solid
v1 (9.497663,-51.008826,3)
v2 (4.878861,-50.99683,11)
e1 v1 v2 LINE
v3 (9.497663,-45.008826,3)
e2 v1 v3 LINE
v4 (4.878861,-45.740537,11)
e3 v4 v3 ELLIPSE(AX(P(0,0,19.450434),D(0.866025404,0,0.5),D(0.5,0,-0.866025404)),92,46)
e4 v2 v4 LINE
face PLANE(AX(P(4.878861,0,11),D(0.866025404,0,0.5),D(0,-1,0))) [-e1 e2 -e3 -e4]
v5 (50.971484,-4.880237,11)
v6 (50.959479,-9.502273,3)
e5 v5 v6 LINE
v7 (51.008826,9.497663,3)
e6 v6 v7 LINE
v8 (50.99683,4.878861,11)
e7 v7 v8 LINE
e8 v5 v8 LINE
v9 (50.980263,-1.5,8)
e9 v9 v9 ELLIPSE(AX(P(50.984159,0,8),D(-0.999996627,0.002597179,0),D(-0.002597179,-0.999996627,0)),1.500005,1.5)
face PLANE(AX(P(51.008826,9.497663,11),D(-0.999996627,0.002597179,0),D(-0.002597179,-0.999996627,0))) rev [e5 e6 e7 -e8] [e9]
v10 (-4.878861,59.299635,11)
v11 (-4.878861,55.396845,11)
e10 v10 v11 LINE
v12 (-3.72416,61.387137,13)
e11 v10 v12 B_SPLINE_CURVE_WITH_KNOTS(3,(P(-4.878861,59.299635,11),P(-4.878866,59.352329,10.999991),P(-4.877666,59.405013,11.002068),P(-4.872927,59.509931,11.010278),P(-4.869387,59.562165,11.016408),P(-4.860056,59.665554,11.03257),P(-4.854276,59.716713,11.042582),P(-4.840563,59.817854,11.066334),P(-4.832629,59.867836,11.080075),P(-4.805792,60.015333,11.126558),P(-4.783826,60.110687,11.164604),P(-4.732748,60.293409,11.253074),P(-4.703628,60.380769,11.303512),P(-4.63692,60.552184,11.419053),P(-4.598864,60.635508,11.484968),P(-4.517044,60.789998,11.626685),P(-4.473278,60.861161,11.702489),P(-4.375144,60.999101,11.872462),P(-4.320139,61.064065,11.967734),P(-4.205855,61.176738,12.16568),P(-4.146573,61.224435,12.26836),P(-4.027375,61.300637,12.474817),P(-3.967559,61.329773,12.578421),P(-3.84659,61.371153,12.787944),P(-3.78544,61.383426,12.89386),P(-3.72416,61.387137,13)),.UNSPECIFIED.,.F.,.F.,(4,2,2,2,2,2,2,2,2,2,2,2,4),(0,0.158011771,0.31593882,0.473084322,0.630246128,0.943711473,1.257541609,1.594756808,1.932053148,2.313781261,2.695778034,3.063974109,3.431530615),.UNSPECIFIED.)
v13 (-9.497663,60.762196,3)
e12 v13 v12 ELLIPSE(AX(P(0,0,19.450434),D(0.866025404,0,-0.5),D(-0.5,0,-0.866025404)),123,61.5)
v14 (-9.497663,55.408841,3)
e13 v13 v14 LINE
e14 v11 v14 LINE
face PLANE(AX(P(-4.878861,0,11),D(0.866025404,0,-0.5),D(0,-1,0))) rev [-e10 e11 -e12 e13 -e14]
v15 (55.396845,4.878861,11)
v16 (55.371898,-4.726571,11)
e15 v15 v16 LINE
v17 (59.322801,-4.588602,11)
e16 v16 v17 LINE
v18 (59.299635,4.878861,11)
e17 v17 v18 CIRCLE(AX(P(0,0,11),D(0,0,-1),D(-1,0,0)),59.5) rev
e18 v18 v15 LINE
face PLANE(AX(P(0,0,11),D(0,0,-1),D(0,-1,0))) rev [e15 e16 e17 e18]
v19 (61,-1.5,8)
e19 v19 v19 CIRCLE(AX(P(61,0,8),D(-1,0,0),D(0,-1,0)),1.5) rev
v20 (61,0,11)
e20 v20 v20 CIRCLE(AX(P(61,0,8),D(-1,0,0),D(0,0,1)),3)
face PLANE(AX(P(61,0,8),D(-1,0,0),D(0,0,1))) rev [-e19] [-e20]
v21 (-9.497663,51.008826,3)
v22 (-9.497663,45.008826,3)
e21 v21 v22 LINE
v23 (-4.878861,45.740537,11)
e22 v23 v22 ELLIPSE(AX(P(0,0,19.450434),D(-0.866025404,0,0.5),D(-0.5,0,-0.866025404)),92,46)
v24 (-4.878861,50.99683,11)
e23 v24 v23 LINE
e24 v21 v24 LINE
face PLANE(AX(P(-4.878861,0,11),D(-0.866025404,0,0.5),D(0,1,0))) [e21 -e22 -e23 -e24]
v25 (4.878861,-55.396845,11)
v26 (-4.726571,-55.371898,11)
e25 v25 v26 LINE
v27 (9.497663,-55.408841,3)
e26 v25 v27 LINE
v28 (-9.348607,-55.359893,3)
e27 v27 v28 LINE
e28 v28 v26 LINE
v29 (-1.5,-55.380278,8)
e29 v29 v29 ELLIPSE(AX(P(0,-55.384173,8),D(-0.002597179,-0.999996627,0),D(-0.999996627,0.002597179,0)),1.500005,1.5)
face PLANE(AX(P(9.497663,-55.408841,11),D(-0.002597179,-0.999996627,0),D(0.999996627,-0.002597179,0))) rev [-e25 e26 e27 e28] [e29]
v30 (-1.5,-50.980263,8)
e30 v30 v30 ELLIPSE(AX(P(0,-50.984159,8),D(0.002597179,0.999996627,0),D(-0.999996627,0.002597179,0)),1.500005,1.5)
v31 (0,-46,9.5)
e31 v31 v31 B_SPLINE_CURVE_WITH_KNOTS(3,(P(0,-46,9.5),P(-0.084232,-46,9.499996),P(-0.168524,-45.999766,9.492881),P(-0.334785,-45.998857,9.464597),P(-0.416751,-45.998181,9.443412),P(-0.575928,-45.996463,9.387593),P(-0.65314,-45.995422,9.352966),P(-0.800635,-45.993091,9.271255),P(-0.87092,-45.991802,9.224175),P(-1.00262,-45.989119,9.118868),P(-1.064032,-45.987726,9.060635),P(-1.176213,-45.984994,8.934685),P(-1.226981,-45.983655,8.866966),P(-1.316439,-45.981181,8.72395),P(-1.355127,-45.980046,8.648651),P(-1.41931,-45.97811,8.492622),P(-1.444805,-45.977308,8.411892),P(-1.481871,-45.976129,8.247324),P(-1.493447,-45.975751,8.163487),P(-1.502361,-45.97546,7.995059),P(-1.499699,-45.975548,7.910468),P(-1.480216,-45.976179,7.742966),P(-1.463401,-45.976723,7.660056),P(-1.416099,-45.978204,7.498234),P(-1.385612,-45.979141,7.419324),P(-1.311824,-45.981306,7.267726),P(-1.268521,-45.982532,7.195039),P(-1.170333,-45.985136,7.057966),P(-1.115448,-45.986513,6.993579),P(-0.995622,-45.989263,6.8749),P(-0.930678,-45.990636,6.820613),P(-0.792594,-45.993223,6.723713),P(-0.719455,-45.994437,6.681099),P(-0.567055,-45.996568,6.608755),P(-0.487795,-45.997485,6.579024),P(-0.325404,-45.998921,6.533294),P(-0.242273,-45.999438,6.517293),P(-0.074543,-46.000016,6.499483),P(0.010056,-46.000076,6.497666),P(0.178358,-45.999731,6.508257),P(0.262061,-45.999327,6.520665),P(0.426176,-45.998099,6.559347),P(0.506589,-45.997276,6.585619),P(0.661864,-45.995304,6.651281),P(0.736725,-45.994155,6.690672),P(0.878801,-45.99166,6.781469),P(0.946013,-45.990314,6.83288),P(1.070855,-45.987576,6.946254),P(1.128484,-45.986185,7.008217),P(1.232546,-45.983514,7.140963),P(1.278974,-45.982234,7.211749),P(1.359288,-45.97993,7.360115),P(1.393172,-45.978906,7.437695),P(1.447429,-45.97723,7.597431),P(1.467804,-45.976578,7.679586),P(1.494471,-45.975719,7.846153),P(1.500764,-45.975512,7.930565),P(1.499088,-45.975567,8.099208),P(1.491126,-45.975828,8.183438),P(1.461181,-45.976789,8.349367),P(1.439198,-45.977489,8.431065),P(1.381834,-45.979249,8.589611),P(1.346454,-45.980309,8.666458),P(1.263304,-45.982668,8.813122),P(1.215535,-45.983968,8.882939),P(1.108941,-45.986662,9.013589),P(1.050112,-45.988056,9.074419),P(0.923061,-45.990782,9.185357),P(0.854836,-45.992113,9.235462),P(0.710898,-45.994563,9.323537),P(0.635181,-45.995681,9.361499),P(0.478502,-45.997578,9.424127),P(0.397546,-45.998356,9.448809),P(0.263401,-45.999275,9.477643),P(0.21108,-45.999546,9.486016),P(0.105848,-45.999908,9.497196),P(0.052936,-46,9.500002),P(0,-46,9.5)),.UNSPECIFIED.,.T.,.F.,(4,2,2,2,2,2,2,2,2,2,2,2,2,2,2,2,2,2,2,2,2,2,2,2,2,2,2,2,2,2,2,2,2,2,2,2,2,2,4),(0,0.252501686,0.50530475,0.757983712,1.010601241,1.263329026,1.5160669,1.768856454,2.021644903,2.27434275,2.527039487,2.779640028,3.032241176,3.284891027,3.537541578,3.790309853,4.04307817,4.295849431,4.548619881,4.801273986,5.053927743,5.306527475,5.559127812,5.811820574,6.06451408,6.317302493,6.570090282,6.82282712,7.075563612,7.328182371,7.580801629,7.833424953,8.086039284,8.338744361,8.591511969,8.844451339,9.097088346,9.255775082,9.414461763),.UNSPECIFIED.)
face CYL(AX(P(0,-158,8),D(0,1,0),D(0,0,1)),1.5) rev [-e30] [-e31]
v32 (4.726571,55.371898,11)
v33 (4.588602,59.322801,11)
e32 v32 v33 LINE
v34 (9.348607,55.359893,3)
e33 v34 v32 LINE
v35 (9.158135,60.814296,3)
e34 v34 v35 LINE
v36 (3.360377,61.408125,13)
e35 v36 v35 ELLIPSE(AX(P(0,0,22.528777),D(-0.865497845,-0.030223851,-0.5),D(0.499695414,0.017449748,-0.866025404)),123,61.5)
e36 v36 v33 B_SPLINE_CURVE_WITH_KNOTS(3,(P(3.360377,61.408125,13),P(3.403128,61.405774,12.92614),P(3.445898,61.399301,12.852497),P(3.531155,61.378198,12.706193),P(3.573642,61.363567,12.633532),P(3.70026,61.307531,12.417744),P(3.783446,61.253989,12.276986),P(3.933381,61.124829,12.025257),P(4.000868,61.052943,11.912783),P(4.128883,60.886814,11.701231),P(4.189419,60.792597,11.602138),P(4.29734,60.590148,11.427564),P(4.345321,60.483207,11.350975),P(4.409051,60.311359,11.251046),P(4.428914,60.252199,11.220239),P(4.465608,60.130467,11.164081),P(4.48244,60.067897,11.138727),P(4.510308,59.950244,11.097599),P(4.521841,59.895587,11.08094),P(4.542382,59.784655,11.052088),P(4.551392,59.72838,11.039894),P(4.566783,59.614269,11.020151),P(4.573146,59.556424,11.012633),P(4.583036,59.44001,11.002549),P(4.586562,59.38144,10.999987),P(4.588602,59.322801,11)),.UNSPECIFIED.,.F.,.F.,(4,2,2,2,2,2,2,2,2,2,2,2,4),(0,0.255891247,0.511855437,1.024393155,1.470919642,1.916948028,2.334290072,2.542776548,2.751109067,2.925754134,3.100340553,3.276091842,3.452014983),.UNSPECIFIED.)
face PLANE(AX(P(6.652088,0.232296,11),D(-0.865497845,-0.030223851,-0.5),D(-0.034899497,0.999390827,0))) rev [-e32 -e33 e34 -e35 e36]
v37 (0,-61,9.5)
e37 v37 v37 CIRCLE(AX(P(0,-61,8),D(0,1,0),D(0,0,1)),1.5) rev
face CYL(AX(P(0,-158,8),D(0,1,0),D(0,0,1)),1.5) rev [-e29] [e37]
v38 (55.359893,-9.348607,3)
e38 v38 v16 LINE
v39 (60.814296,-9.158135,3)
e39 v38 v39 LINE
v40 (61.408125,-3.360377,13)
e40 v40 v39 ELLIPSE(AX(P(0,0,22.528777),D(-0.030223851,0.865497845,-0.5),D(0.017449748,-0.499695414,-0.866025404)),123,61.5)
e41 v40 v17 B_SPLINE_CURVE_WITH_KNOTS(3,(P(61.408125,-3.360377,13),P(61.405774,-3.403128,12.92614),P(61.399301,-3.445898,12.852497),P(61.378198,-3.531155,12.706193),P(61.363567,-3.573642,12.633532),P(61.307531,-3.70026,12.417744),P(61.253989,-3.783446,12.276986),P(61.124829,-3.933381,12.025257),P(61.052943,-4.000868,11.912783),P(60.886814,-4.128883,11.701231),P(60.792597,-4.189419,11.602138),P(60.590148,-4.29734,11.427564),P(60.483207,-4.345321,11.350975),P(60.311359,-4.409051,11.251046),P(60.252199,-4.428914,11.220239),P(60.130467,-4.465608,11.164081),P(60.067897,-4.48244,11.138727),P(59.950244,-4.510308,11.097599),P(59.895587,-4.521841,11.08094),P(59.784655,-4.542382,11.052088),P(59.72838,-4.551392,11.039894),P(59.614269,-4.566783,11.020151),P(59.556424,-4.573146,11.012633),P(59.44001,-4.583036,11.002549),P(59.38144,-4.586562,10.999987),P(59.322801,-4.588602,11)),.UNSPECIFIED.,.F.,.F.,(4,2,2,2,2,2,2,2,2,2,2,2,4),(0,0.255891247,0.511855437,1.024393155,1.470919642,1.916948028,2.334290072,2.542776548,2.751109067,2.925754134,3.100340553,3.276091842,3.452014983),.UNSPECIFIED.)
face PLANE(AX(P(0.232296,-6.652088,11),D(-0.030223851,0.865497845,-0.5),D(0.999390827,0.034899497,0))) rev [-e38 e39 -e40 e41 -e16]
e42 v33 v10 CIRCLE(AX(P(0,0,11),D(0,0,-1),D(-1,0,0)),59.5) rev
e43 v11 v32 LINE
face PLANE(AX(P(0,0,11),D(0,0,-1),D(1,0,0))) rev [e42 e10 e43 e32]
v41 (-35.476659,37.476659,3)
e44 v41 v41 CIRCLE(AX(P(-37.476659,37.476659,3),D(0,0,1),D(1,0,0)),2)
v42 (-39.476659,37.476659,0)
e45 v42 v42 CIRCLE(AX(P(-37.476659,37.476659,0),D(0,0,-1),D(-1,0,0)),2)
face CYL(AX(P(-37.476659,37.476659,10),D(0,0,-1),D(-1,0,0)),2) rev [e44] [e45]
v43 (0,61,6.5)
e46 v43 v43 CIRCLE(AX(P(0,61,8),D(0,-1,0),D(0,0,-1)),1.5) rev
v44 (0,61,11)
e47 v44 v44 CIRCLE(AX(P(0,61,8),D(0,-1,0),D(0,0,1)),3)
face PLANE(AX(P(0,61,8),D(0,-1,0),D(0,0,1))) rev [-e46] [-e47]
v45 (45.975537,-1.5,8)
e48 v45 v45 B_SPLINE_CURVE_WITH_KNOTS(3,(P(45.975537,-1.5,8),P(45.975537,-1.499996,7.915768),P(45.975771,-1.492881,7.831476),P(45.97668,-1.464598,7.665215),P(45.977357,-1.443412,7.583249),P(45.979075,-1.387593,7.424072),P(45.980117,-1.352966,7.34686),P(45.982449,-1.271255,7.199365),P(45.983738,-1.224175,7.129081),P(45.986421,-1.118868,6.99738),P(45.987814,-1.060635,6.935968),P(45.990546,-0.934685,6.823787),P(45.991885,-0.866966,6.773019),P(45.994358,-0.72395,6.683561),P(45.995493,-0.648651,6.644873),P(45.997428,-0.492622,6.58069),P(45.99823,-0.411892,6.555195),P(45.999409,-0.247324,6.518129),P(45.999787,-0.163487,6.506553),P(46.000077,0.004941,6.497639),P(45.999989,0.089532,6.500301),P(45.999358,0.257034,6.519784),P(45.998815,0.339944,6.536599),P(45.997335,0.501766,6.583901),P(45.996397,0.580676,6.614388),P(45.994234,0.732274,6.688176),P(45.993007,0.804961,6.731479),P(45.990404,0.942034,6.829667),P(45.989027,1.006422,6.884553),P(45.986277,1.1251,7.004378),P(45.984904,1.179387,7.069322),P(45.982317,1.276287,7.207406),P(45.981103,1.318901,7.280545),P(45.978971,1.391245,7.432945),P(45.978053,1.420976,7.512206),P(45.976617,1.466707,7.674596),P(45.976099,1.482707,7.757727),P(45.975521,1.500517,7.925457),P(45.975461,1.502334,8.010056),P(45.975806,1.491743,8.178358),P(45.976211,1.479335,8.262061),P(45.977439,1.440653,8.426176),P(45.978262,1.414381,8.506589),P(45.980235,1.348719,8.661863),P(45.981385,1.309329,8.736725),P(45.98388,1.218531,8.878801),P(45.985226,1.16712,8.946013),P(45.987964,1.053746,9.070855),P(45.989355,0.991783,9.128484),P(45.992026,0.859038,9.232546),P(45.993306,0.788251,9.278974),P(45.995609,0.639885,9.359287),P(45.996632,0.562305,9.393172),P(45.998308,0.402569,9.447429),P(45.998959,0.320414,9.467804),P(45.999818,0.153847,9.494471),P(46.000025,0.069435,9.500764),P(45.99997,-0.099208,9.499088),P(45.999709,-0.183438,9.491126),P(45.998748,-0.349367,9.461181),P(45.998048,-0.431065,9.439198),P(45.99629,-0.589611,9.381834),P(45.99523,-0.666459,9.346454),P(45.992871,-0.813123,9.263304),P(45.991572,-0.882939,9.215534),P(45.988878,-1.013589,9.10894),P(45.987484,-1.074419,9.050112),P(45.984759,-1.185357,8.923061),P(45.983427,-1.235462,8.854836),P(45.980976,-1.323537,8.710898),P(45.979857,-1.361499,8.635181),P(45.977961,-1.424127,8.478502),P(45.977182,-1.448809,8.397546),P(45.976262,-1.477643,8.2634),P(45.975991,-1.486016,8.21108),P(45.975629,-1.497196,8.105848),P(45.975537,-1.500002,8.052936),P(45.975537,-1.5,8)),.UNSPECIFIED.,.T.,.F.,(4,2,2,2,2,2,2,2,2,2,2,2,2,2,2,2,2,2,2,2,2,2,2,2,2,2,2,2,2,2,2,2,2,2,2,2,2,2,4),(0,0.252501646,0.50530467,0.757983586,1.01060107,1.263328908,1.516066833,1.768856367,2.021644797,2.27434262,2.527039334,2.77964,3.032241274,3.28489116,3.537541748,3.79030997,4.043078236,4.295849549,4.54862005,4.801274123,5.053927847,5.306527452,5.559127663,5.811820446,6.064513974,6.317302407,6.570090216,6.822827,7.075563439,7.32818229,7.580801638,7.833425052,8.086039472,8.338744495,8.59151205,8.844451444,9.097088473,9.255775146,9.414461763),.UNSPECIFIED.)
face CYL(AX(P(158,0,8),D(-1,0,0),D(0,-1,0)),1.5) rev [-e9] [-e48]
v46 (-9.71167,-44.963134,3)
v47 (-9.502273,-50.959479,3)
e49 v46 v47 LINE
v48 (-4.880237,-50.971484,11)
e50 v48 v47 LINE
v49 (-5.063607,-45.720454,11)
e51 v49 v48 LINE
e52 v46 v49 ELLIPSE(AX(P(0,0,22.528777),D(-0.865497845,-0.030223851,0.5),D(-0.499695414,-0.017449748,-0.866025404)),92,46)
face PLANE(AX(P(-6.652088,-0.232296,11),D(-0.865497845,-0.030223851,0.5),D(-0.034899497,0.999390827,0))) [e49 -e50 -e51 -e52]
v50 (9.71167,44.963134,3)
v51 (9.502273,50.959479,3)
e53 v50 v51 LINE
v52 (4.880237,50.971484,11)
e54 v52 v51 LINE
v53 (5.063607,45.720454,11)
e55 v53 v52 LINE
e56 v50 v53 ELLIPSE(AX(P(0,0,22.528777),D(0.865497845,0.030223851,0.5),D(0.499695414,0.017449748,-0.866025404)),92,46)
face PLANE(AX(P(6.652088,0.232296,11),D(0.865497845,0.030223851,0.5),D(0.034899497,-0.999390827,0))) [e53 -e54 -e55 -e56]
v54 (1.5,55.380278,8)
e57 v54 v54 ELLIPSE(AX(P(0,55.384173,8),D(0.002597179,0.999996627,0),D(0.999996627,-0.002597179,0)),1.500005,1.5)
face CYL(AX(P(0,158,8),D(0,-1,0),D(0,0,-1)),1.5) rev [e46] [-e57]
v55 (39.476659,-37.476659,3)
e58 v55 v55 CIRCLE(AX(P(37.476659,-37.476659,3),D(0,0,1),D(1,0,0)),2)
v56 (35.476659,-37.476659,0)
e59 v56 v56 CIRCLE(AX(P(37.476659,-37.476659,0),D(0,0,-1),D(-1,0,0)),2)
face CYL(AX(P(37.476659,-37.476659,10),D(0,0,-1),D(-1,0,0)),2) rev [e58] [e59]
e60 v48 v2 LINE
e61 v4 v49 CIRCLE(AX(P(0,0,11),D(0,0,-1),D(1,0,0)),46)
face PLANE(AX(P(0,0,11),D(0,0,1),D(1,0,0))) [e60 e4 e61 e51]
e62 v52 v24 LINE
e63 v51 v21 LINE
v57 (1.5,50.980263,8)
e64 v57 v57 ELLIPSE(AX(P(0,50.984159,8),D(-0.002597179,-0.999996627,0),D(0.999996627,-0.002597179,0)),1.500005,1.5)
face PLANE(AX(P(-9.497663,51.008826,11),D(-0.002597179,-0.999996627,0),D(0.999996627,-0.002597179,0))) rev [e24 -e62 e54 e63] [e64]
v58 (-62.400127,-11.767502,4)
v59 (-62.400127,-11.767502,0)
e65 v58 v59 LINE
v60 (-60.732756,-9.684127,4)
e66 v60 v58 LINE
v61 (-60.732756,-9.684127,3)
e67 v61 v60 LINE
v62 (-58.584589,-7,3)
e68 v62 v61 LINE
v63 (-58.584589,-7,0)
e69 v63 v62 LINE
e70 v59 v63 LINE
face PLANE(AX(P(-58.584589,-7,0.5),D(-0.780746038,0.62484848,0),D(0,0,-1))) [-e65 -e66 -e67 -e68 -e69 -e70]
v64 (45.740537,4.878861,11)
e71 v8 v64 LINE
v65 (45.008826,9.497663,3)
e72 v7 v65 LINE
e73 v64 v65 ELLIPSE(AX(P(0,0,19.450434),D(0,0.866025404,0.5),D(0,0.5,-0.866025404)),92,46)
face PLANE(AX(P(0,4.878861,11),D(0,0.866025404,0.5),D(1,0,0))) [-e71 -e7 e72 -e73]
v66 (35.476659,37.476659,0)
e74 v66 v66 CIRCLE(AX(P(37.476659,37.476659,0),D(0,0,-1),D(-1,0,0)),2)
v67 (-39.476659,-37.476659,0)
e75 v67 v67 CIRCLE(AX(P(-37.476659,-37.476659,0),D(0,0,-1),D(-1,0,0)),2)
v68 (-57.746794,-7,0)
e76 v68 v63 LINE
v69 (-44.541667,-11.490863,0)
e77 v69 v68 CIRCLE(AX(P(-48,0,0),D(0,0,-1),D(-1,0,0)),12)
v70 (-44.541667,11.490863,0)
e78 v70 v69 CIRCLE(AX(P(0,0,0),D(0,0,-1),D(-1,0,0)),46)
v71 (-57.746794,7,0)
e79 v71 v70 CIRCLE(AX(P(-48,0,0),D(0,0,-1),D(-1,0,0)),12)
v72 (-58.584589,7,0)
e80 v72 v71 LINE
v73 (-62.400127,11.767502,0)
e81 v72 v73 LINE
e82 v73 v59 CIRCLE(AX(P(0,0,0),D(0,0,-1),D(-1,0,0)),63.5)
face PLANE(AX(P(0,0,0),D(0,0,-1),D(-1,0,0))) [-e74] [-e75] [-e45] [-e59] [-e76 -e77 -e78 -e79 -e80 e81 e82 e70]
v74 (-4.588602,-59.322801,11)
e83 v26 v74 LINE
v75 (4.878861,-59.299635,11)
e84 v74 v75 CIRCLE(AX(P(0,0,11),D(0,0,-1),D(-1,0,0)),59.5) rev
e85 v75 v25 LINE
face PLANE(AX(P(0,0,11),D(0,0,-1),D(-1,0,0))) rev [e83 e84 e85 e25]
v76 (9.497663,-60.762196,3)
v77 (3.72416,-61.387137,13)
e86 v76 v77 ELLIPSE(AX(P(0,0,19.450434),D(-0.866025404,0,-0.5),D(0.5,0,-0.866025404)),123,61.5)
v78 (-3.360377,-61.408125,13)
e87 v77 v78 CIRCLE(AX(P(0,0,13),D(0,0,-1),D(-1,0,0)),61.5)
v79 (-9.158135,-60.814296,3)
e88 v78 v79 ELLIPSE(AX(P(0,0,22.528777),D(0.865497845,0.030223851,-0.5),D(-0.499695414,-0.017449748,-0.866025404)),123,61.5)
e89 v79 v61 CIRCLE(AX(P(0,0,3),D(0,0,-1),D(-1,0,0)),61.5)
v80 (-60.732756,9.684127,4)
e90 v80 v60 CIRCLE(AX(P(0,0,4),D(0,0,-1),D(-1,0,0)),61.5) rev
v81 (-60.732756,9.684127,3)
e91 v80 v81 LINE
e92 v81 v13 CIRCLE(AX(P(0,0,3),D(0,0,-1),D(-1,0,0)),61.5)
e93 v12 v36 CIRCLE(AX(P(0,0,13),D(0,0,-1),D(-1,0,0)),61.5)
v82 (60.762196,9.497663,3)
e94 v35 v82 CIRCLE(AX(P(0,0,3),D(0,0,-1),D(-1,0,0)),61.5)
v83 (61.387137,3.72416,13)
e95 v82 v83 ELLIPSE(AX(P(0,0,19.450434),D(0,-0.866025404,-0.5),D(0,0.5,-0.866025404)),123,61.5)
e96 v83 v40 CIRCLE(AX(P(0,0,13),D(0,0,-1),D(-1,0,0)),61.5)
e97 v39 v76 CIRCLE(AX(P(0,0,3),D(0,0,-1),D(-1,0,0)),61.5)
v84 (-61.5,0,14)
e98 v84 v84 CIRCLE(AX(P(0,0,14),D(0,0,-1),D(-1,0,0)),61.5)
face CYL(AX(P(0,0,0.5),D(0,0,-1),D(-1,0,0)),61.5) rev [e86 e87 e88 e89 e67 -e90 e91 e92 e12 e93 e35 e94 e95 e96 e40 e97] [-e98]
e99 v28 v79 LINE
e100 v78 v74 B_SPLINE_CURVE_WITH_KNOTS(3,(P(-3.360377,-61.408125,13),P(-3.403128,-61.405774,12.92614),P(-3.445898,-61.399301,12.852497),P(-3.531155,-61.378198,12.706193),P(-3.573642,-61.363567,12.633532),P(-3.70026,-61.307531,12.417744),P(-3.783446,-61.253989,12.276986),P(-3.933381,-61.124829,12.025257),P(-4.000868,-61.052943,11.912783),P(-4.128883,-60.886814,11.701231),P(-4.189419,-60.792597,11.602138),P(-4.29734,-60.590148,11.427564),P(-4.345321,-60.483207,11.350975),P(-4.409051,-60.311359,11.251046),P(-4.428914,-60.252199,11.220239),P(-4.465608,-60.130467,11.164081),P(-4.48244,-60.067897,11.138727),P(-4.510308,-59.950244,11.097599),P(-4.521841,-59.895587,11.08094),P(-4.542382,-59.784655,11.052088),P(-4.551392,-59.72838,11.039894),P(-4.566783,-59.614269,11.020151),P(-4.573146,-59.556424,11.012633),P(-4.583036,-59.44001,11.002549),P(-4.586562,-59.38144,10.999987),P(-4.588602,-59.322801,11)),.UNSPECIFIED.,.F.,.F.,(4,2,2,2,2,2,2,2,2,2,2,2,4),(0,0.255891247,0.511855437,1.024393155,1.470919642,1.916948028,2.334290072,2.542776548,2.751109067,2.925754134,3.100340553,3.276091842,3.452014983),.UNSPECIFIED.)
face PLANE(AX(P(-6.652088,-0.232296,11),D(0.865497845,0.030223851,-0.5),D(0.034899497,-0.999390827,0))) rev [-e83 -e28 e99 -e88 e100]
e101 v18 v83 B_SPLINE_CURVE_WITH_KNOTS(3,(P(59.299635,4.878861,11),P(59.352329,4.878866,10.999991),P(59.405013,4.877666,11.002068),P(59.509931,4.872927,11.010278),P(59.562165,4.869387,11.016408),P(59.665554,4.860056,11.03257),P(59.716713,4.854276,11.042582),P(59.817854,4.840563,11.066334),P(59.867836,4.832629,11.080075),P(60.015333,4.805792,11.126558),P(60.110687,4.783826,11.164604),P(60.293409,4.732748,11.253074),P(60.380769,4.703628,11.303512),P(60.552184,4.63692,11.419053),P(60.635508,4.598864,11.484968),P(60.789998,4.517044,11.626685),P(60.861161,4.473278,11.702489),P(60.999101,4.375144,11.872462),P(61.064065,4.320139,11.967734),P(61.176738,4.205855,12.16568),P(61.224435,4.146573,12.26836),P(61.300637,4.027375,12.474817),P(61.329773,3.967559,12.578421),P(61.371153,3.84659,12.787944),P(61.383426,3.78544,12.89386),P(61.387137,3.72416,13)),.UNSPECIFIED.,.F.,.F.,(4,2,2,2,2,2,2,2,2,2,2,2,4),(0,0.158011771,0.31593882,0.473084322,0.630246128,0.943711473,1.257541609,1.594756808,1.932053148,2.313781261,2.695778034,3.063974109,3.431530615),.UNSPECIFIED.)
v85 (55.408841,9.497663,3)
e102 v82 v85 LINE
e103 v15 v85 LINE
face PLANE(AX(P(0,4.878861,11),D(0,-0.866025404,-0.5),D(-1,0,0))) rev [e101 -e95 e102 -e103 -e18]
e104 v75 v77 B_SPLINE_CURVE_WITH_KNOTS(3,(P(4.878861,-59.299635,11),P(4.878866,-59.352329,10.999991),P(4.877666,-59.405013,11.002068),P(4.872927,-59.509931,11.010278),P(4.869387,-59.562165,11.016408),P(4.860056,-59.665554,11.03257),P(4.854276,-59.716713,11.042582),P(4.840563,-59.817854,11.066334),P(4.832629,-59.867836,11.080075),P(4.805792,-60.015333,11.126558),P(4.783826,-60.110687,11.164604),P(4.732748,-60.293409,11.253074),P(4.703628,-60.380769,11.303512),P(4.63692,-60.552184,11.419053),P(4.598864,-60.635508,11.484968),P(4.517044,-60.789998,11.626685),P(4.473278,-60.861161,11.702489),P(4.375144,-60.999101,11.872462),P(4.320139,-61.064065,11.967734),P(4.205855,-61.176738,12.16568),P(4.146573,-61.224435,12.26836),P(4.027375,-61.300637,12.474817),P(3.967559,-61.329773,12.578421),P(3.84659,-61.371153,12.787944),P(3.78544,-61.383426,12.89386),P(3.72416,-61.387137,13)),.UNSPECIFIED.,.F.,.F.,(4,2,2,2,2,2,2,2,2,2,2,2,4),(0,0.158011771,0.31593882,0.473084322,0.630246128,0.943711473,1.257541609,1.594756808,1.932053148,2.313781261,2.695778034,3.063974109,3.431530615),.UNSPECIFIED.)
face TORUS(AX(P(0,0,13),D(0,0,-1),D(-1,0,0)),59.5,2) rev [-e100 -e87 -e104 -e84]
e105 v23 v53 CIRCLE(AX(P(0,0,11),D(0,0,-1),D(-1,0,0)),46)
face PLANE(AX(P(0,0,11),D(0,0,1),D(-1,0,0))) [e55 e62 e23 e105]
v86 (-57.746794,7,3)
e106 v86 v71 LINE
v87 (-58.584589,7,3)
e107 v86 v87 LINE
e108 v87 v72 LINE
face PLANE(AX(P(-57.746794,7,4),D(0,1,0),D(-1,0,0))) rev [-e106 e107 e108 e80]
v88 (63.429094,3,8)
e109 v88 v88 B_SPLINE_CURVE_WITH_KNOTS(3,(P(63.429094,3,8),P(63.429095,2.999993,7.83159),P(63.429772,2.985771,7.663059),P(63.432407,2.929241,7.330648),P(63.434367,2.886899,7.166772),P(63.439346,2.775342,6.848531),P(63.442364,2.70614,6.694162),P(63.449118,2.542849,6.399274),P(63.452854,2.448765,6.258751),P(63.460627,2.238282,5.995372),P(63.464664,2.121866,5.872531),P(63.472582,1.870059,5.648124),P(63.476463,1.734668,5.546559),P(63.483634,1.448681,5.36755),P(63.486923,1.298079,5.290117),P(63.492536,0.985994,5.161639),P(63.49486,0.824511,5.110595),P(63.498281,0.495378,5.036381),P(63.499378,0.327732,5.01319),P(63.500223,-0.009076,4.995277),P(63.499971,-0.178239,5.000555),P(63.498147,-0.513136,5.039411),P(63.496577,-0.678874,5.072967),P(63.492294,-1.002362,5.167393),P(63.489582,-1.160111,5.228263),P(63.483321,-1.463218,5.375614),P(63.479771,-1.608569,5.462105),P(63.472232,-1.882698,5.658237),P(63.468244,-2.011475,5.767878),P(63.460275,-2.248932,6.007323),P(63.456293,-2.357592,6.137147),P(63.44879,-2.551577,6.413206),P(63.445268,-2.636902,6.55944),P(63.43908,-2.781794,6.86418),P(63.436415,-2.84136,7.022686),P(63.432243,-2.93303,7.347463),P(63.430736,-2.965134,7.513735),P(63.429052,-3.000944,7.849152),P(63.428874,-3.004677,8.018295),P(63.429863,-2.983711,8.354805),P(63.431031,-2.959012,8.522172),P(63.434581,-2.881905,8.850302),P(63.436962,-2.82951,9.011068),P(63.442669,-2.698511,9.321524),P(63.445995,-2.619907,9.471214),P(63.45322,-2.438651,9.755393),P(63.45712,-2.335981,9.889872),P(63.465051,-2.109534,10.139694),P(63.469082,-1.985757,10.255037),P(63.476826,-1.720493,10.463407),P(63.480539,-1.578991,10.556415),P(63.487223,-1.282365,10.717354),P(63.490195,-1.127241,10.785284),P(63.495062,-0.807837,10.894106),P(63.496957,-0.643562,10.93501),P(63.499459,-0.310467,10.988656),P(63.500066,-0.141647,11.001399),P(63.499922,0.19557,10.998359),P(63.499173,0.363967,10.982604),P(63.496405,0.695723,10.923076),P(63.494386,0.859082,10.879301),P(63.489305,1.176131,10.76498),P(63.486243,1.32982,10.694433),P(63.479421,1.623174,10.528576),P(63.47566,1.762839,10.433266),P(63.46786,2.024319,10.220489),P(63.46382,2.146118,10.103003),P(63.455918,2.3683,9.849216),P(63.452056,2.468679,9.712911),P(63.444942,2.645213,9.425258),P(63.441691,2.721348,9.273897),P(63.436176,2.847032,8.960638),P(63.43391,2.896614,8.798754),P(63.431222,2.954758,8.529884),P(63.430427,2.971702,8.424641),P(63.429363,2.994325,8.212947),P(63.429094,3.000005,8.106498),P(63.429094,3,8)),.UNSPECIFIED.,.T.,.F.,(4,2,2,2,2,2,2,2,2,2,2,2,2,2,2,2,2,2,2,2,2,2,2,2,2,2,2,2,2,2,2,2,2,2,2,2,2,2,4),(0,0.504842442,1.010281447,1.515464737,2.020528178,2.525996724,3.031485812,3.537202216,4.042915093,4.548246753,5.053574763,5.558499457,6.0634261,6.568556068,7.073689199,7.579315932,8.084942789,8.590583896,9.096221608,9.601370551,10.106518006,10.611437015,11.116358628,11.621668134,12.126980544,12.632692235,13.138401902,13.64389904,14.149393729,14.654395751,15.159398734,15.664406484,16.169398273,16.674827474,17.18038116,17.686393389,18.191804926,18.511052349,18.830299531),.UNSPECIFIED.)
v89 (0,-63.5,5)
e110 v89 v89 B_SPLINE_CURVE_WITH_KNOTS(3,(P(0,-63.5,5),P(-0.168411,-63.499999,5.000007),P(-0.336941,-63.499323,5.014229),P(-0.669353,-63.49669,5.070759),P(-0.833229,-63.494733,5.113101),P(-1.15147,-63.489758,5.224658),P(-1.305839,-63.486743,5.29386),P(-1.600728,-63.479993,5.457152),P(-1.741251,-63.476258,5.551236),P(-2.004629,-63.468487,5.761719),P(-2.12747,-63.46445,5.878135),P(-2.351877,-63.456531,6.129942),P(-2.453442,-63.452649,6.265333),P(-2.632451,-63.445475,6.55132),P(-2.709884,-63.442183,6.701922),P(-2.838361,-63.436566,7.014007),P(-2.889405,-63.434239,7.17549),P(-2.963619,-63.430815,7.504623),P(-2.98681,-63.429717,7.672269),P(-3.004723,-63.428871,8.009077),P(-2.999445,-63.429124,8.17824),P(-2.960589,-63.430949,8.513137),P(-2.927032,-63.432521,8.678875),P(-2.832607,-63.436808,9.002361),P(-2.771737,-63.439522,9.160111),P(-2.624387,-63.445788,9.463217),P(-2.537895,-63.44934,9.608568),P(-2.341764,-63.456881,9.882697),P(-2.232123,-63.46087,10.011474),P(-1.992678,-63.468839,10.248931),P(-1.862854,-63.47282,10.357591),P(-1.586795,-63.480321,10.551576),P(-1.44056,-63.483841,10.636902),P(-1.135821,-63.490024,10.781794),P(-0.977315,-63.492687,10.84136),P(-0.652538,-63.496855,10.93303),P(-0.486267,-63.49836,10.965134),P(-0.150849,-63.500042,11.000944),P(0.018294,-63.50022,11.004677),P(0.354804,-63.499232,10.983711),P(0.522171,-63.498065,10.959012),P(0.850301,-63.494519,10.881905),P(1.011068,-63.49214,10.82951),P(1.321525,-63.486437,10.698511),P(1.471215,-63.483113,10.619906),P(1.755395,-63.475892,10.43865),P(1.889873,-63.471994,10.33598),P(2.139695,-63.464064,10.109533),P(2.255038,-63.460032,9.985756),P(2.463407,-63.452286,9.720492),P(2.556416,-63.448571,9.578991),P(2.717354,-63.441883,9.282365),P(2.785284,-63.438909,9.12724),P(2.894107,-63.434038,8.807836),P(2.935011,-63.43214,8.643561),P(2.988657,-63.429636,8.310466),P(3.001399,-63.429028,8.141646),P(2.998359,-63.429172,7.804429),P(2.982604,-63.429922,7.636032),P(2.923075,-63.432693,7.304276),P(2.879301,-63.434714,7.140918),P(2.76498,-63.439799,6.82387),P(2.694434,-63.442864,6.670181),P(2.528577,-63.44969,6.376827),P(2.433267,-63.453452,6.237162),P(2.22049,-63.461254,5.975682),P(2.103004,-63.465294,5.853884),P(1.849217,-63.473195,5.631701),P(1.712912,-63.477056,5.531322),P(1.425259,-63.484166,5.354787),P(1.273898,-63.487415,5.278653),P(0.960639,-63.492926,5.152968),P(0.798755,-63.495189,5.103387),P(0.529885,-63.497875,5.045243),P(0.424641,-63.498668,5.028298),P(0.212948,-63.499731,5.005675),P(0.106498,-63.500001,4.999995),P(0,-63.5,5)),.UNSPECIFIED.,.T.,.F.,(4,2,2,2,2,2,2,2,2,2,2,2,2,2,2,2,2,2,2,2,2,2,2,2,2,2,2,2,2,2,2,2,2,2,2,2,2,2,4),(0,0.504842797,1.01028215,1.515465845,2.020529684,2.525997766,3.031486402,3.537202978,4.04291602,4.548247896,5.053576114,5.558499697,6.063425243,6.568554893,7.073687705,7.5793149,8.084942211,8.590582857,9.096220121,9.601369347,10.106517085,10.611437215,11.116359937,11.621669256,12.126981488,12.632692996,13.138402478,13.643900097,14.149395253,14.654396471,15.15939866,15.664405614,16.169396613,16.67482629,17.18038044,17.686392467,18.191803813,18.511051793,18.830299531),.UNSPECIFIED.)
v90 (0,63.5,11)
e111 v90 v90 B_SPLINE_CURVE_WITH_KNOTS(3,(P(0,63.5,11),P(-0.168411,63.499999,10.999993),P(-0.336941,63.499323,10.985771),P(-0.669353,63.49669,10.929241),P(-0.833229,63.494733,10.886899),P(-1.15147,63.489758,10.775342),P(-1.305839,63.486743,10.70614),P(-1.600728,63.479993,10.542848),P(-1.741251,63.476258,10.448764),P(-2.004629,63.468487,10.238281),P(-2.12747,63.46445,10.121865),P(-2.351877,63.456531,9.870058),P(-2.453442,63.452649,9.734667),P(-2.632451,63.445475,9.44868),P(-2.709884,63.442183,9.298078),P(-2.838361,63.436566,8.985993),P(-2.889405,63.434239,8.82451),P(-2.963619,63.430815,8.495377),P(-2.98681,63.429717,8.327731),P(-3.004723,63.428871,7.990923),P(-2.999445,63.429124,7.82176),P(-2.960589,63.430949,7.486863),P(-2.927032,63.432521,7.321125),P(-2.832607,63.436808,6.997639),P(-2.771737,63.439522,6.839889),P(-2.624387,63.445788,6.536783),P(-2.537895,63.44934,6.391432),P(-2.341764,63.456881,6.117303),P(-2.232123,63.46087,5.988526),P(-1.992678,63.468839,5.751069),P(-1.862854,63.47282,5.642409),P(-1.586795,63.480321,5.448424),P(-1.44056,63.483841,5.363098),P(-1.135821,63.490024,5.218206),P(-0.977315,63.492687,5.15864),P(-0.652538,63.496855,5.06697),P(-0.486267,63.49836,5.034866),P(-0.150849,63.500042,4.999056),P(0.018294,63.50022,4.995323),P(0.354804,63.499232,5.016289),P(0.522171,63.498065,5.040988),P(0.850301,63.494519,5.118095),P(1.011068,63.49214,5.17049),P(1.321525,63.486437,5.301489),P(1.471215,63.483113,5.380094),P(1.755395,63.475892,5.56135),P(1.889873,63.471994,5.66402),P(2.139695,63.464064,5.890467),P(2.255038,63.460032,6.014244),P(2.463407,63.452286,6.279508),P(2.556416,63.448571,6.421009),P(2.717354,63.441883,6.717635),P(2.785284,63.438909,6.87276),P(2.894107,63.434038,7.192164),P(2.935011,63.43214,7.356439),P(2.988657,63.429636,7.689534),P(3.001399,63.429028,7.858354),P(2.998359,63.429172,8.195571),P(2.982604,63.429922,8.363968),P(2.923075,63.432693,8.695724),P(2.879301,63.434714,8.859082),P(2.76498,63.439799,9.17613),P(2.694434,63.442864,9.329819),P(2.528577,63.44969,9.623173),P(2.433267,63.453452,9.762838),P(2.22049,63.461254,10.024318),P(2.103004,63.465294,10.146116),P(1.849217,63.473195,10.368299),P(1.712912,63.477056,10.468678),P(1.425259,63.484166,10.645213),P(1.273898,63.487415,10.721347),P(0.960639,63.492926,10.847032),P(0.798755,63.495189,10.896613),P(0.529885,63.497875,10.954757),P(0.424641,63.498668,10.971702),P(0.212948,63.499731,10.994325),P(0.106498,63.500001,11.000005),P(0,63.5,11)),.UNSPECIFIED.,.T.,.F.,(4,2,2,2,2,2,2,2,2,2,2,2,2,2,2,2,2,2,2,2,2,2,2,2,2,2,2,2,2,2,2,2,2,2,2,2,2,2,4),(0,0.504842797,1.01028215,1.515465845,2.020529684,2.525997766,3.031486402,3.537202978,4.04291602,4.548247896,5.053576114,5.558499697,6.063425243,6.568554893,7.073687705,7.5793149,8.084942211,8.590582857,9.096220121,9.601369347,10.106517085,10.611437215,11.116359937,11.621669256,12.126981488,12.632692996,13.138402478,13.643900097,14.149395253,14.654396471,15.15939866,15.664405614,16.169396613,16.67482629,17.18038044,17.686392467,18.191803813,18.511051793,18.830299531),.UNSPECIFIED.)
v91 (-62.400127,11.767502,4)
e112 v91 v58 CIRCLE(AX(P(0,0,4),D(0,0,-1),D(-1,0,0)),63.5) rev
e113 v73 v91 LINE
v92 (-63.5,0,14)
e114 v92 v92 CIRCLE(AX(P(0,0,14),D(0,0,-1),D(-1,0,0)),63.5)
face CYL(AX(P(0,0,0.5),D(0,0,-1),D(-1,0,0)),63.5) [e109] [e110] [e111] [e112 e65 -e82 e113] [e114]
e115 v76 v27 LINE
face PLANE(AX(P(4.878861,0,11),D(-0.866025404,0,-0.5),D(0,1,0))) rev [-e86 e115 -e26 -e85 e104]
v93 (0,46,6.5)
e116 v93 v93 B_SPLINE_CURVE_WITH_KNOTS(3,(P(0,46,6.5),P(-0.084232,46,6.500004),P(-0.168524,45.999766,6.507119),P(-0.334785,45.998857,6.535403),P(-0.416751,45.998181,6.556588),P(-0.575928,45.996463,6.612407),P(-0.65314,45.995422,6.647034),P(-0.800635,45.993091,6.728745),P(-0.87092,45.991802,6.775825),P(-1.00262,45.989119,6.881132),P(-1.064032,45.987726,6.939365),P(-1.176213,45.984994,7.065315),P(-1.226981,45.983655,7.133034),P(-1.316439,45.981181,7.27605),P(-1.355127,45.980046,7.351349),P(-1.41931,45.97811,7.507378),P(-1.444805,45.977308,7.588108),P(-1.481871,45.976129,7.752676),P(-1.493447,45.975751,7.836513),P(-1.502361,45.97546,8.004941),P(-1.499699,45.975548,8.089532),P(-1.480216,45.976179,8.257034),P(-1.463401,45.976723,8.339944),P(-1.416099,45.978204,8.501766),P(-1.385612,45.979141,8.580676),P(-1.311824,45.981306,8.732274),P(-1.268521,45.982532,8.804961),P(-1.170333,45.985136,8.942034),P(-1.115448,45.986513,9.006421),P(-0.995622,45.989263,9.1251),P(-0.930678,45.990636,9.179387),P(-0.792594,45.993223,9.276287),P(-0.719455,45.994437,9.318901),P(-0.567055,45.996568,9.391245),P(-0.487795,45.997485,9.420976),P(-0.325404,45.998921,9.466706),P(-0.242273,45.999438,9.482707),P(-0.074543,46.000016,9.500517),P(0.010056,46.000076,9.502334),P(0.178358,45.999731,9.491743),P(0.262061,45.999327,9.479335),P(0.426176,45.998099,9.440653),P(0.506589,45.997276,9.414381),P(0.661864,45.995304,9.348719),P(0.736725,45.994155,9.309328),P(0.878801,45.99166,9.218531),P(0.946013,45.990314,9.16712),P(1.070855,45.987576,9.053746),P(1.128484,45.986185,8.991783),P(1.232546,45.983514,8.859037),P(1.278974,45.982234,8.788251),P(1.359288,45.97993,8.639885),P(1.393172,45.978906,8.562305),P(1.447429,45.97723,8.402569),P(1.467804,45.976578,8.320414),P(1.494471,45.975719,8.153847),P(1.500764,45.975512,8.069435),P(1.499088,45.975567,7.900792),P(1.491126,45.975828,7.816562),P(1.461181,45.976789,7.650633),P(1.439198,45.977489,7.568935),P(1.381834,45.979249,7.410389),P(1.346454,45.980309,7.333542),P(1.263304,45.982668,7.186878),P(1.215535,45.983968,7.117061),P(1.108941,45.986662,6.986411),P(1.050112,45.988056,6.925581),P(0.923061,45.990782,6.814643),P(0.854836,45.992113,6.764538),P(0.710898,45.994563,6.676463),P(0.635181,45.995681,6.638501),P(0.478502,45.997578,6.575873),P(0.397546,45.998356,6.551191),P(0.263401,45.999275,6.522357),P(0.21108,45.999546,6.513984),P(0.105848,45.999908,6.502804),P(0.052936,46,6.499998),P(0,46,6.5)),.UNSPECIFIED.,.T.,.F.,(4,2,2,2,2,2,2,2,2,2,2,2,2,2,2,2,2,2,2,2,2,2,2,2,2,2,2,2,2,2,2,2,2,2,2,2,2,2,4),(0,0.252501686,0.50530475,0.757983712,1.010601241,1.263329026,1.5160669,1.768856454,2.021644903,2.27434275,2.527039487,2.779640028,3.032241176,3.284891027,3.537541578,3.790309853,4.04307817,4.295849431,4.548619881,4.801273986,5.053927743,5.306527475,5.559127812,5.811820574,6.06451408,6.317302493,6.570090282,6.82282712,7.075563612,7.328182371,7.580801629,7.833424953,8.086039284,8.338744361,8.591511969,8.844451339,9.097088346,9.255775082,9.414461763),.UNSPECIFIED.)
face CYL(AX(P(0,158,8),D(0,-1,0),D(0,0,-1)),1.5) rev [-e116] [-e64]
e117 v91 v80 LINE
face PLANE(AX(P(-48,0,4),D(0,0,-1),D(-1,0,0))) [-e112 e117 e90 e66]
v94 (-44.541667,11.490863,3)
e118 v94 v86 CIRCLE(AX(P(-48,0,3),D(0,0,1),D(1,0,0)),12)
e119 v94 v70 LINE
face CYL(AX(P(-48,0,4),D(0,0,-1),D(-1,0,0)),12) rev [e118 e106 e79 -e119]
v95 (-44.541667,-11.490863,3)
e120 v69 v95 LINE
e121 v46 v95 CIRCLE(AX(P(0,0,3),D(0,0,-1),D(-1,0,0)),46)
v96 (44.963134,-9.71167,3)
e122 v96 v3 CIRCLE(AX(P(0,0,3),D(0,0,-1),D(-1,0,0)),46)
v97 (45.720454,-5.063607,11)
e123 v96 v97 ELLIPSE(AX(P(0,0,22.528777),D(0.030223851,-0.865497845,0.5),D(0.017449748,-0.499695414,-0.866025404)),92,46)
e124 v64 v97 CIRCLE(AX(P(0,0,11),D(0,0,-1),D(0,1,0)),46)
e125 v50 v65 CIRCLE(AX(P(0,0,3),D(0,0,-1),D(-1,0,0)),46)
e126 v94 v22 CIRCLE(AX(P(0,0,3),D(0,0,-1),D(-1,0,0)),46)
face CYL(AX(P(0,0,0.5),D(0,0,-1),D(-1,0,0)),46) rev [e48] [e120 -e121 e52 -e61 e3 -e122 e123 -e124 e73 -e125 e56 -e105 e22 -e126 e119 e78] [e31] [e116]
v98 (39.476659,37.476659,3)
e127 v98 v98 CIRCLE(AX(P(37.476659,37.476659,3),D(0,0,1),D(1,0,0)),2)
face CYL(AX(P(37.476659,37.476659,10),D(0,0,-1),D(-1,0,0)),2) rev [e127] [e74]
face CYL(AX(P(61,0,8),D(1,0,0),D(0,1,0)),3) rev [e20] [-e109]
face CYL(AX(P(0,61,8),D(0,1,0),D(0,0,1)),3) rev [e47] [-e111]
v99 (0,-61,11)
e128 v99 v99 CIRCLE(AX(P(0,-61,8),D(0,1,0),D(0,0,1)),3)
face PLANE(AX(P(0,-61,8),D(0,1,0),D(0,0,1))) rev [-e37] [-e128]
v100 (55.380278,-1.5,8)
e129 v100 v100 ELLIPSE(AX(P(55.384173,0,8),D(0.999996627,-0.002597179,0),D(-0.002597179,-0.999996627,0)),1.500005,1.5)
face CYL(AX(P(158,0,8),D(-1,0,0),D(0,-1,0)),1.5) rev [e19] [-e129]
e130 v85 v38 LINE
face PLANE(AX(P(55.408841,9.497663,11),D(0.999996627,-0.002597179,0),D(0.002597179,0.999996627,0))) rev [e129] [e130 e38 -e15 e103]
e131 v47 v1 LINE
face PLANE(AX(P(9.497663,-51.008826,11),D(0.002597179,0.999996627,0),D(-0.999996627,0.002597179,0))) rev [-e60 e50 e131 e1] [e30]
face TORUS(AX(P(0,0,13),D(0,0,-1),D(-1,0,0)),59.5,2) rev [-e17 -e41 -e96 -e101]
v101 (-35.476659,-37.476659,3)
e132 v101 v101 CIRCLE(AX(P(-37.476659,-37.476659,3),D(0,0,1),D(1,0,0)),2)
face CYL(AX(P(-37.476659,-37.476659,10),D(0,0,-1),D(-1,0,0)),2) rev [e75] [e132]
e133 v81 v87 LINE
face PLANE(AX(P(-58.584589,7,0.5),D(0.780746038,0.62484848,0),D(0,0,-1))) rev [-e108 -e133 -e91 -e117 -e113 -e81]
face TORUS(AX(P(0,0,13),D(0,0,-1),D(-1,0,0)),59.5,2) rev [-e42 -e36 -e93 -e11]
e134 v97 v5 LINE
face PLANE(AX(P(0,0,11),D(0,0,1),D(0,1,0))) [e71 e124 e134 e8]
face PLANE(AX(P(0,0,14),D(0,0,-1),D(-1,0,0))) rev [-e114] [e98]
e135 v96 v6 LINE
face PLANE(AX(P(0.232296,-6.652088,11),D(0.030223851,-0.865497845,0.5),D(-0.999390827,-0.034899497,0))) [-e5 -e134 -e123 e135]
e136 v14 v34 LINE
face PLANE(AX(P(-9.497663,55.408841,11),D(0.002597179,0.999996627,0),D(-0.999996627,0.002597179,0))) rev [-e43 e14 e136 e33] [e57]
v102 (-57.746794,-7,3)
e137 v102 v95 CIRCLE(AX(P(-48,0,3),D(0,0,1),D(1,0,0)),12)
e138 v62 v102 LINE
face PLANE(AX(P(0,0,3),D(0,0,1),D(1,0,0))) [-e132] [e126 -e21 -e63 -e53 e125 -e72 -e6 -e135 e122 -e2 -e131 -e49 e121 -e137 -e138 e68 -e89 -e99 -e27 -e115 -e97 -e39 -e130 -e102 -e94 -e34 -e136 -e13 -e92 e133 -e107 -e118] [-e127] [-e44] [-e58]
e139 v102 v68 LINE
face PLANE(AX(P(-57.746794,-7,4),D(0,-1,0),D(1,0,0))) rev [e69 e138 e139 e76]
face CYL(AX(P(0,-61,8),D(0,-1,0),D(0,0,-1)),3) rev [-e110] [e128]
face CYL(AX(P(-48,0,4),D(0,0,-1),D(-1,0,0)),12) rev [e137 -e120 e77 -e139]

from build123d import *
from OCP.BRepFilletAPI import BRepFilletAPI_MakeChamfer

# Parameters (mm, degrees)
CUT_EXTRUDE1_DEPTH             = 4
CHAMFER1_SIZE                  = 4.528404541
BOSS_EXTRUDE1_START            = 8
BOSS_EXTRUDE1_DEPTH            = 8
CHAMFER2_SIZE                  = 8
CHAMFER2_SIZE_2                = 4.618802154
CIRPATTERN1_COUNT              = 3
CIRPATTERN1_ANGLE              = 180
CHAMFER2_OF_CIRPATTERN1_SIZE   = 8
CHAMFER2_OF_CIRPATTERN1_SIZE_2 = 4.618802154
FILLET1_R                      = 2
SKETCH4_R                      = 2
CUT_EXTRUDE2_DEPTH             = 10
SKETCH5_R                      = 1.5
CUT_EXTRUDE3_DEPTH             = 158
SKETCH7_R                      = 3
CUT_EXTRUDE5_DEPTH             = 4
CIRPATTERN3_COUNT              = 3
CIRPATTERN3_ANGLE              = 180


# Some blends are built 0.0001 mm under size
with BuildPart() as part:
    # Sketch1 → Revolve1 (revolve)
    with BuildSketch(Plane(origin=(0, 0, 0), x_dir=(1, 0, 0), z_dir=(0, 1, 0))):
        Polygon((-46, 0), (-46, -3), (-61.5, -3), (-61.5, -14), (-63.5, -14), (-63.5, 0), align=None)
    revolve(axis=Axis((0, 0, 0.5), (0, 0, 1)))

    # Sketch2 → Cut-Extrude1 (cut)
    with BuildSketch(Plane(origin=(0, 0, 0), x_dir=(-1, 0, 0), z_dir=(0, 0, -1))):
        with BuildLine():
            Line((57.746794345, 7), (73.255615774, 7))
            Line((73.255615774, 7), (73.255615774, -7))
            Line((73.255615774, -7), (57.746794345, -7))
            ThreePointArc((57.746794345, -7), (36, 0), (57.746794345, 7))
        make_face()
    extrude(amount=-CUT_EXTRUDE1_DEPTH, mode=Mode.SUBTRACT)

    # Chamfer1
    # the kernel refuses this chamfer: 5, 4.528404541 mm, written as the material it takes off along each edge
    with BuildSketch(Plane(origin=(-63.112993908, -7, 4), x_dir=(1, 0, 0), z_dir=(0, 0, -1))) as chamfer1_piece_1:
        with BuildLine():
            Line((CHAMFER1_SIZE, 0), (0.712866483, 4.767501749))
            ThreePointArc((0.712866483, 4.767501749), (0.321261242, 2.457711608), (0, 0))
            Line((0, 0), (CHAMFER1_SIZE, 0))
        make_face()
    extrude(amount=16.39656237, mode=Mode.SUBTRACT)
    with BuildSketch(Plane(origin=(-63.112993908, 7, 4), x_dir=(1, 0, 0), z_dir=(0, 0, -1))) as chamfer1_piece_2:
        with BuildLine():
            Line((CHAMFER1_SIZE, 0), (0.712866483, -4.767501749))
            ThreePointArc((0.712866483, -4.767501749), (0.321261242, -2.457711608), (0, 0))
            Line((0, 0), (CHAMFER1_SIZE, 0))
        make_face()
    extrude(amount=16.39656237, mode=Mode.SUBTRACT)

    # Sketch3 → Boss-Extrude1 (add)
    with BuildSketch(Plane.XY.offset(3).offset(BOSS_EXTRUDE1_START)):
        with BuildLine():
            Line((-9.502273243, -50.959479433), (-9.711670224, -44.963134471))
            ThreePointArc((-9.711670224, -44.963134471), (-0.109415415, -45.999869872), (9.497662676, -45.008825842))
            Line((9.497662676, -45.008825842), (9.497662676, -51.008825842))
            Line((9.497662676, -51.008825842), (-9.502273243, -50.959479433))
        make_face()
        with BuildLine():
            Line((9.497662676, -55.408840682), (-9.348607402, -55.359893372))
            Line((-9.348607402, -55.359893372), (-9.158135478, -60.814295643))
            ThreePointArc((-9.158135478, -60.814295643), (0.171750649, -61.499760176), (9.497662676, -60.762195514))
            Line((9.497662676, -60.762195514), (9.497662676, -55.408840682))
        make_face()
    boss_extrude1 = extrude(amount=-BOSS_EXTRUDE1_DEPTH)

    # Chamfer2
    chamfer2_edges_1 = [part.edges().sort_by_distance(p)[0] for p in [
        (-9.25337144, -58.087094508, 11),
    ]]
    chamfer2_side_1 = [part.faces().sort_by_distance(p)[0] for p in [
        (-9.25337144, -58.087094508, 10.907623957),
    ]]
    chamfer2_edges_2 = [part.edges().sort_by_distance(p)[0] for p in [
        (-9.606971733, -47.961306952, 11),
    ]]
    chamfer2_side_2 = [part.faces().sort_by_distance(p)[0] for p in [
        (-9.606971733, -47.961306952, 10.907623957),
    ]]
    chamfer2_edges_3 = [part.edges().sort_by_distance(p)[0] for p in [
        (9.497662676, -48.008825842, 11),
    ]]
    chamfer2_side_3 = [part.faces().sort_by_distance(p)[0] for p in [
        (9.497662676, -48.008825842, 10.907623957),
    ]]
    chamfer2_edges_4 = [part.edges().sort_by_distance(p)[0] for p in [
        (9.497662676, -58.085518098, 11),
    ]]
    chamfer2_side_4 = [part.faces().sort_by_distance(p)[0] for p in [
        (9.497662676, -58.085518098, 10.907623957),
    ]]
    chamfer2 = BRepFilletAPI_MakeChamfer(part.part.solid().wrapped)
    for e in chamfer2_edges_1:
        chamfer2.Add(CHAMFER2_SIZE - 0.0001, CHAMFER2_SIZE_2 - 0.0001, e.wrapped, chamfer2_side_1[0].wrapped)
    for e in chamfer2_edges_2:
        chamfer2.Add(CHAMFER2_SIZE - 0.0001, CHAMFER2_SIZE_2 - 0.0001, e.wrapped, chamfer2_side_2[0].wrapped)
    for e in chamfer2_edges_3:
        chamfer2.Add(CHAMFER2_SIZE - 0.0001, CHAMFER2_SIZE_2 - 0.0001, e.wrapped, chamfer2_side_3[0].wrapped)
    for e in chamfer2_edges_4:
        chamfer2.Add(CHAMFER2_SIZE - 0.0001, CHAMFER2_SIZE_2 - 0.0001, e.wrapped, chamfer2_side_4[0].wrapped)
    add(Compound.cast(chamfer2.Shape()), mode=Mode.REPLACE)  # a hair under: the kernel refuses the full size

    # CirPattern1: Boss-Extrude1 ×3 about axis
    cirpattern1_axis = Axis((0, 0, 0), (0, 0, 1))
    for i in range(1, CIRPATTERN1_COUNT):
        add(boss_extrude1.rotate(cirpattern1_axis, i * CIRPATTERN1_ANGLE / (CIRPATTERN1_COUNT - 1)))

    # Chamfer2 of CirPattern1
    chamfer2_of_cirpattern1_edges_1 = [part.edges().sort_by_distance(p)[0] for p in [
        (58.087094508, -9.25337144, 11),
    ]]
    chamfer2_of_cirpattern1_side_1 = [part.faces().sort_by_distance(p)[0] for p in [
        (58.087094508, -9.25337144, 10.907623957),
    ]]
    chamfer2_of_cirpattern1_edges_2 = [part.edges().sort_by_distance(p)[0] for p in [
        (47.961306952, -9.606971733, 11),
    ]]
    chamfer2_of_cirpattern1_side_2 = [part.faces().sort_by_distance(p)[0] for p in [
        (47.958083075, -9.514651963, 11),
    ]]
    chamfer2_of_cirpattern1_edges_3 = [part.edges().sort_by_distance(p)[0] for p in [
        (48.008825842, 9.497662676, 11),
    ]]
    chamfer2_of_cirpattern1_side_3 = [part.faces().sort_by_distance(p)[0] for p in [
        (48.008825842, 9.497662676, 10.907623957),
    ]]
    chamfer2_of_cirpattern1_edges_4 = [part.edges().sort_by_distance(p)[0] for p in [
        (58.085518098, 9.497662676, 11),
    ]]
    chamfer2_of_cirpattern1_side_4 = [part.faces().sort_by_distance(p)[0] for p in [
        (58.085518098, 9.497662676, 10.907623957),
    ]]
    chamfer2_of_cirpattern1_edges_5 = [part.edges().sort_by_distance(p)[0] for p in [
        (9.25337144, 58.087094508, 11),
    ]]
    chamfer2_of_cirpattern1_side_5 = [part.faces().sort_by_distance(p)[0] for p in [
        (9.25337144, 58.087094508, 10.907623957),
    ]]
    chamfer2_of_cirpattern1_edges_6 = [part.edges().sort_by_distance(p)[0] for p in [
        (9.606971733, 47.961306952, 11),
    ]]
    chamfer2_of_cirpattern1_side_6 = [part.faces().sort_by_distance(p)[0] for p in [
        (9.606971733, 47.961306952, 10.907623957),
    ]]
    chamfer2_of_cirpattern1_edges_7 = [part.edges().sort_by_distance(p)[0] for p in [
        (-9.497662676, 48.008825842, 11),
    ]]
    chamfer2_of_cirpattern1_side_7 = [part.faces().sort_by_distance(p)[0] for p in [
        (-9.497662676, 48.008825842, 10.907623957),
    ]]
    chamfer2_of_cirpattern1_edges_8 = [part.edges().sort_by_distance(p)[0] for p in [
        (-9.497662676, 58.085518098, 11),
    ]]
    chamfer2_of_cirpattern1_side_8 = [part.faces().sort_by_distance(p)[0] for p in [
        (-9.497662676, 58.085518098, 10.907623957),
    ]]
    chamfer2_of_cirpattern1 = BRepFilletAPI_MakeChamfer(part.part.solid().wrapped)
    for e in chamfer2_of_cirpattern1_edges_1:
        chamfer2_of_cirpattern1.Add(CHAMFER2_OF_CIRPATTERN1_SIZE - 0.0001, CHAMFER2_OF_CIRPATTERN1_SIZE_2 - 0.0001, e.wrapped, chamfer2_of_cirpattern1_side_1[0].wrapped)
    for e in chamfer2_of_cirpattern1_edges_2:
        chamfer2_of_cirpattern1.Add(CHAMFER2_OF_CIRPATTERN1_SIZE_2 - 0.0001, CHAMFER2_OF_CIRPATTERN1_SIZE - 0.0001, e.wrapped, chamfer2_of_cirpattern1_side_2[0].wrapped)
    for e in chamfer2_of_cirpattern1_edges_3:
        chamfer2_of_cirpattern1.Add(CHAMFER2_OF_CIRPATTERN1_SIZE - 0.0001, CHAMFER2_OF_CIRPATTERN1_SIZE_2 - 0.0001, e.wrapped, chamfer2_of_cirpattern1_side_3[0].wrapped)
    for e in chamfer2_of_cirpattern1_edges_4:
        chamfer2_of_cirpattern1.Add(CHAMFER2_OF_CIRPATTERN1_SIZE - 0.0001, CHAMFER2_OF_CIRPATTERN1_SIZE_2 - 0.0001, e.wrapped, chamfer2_of_cirpattern1_side_4[0].wrapped)
    for e in chamfer2_of_cirpattern1_edges_5:
        chamfer2_of_cirpattern1.Add(CHAMFER2_OF_CIRPATTERN1_SIZE - 0.0001, CHAMFER2_OF_CIRPATTERN1_SIZE_2 - 0.0001, e.wrapped, chamfer2_of_cirpattern1_side_5[0].wrapped)
    for e in chamfer2_of_cirpattern1_edges_6:
        chamfer2_of_cirpattern1.Add(CHAMFER2_OF_CIRPATTERN1_SIZE - 0.0001, CHAMFER2_OF_CIRPATTERN1_SIZE_2 - 0.0001, e.wrapped, chamfer2_of_cirpattern1_side_6[0].wrapped)
    for e in chamfer2_of_cirpattern1_edges_7:
        chamfer2_of_cirpattern1.Add(CHAMFER2_OF_CIRPATTERN1_SIZE - 0.0001, CHAMFER2_OF_CIRPATTERN1_SIZE_2 - 0.0001, e.wrapped, chamfer2_of_cirpattern1_side_7[0].wrapped)
    for e in chamfer2_of_cirpattern1_edges_8:
        chamfer2_of_cirpattern1.Add(CHAMFER2_OF_CIRPATTERN1_SIZE - 0.0001, CHAMFER2_OF_CIRPATTERN1_SIZE_2 - 0.0001, e.wrapped, chamfer2_of_cirpattern1_side_8[0].wrapped)
    add(Compound.cast(chamfer2_of_cirpattern1.Shape()), mode=Mode.REPLACE)  # a hair under: the kernel refuses the full size

    # Fillet1
    fillet1_edges = [part.edges().sort_by_distance(p)[0] for p in [
        (0.180770138, -61.499734326, 11),
        (61.499734326, 0.180770138, 11),
        (-0.180770138, 61.499734326, 11),
    ]]
    fillet(fillet1_edges, radius=FILLET1_R)

    # Sketch4 → Cut-Extrude2 (cut)
    with BuildSketch(Plane(origin=(0, 0, 0), x_dir=(-1, 0, 0), z_dir=(0, 0, -1))):
        with Locations((-37.476659403, 37.476659403)):
            Circle(SKETCH4_R)
        with Locations((37.476659403, 37.476659403)):
            Circle(SKETCH4_R)
        with Locations((37.476659403, -37.476659403)):
            Circle(SKETCH4_R)
        with Locations((-37.476659403, -37.476659403)):
            Circle(SKETCH4_R)
    extrude(amount=-CUT_EXTRUDE2_DEPTH, mode=Mode.SUBTRACT)

    # Sketch5 → Cut-Extrude3 (cut)
    with BuildSketch(Plane(origin=(0, 0, 0), x_dir=(1, 0, 0), z_dir=(0, 1, 0))):
        with Locations(Location((0, -8, 0), (0, 0, 270))):
            Circle(SKETCH5_R)
    cut_extrude3 = extrude(amount=-CUT_EXTRUDE3_DEPTH, mode=Mode.SUBTRACT)

    # Sketch7 → Cut-Extrude5 (cut)
    with BuildSketch(Plane(origin=(0, -65, 0), x_dir=(1, 0, 0), z_dir=(0, 1, 0))):
        with Locations(Location((0, -8, 0), (0, 0, 90))):
            Circle(SKETCH7_R)
    cut_extrude5 = extrude(amount=CUT_EXTRUDE5_DEPTH, mode=Mode.SUBTRACT)

    # CirPattern3: Cut-Extrude3, Cut-Extrude5 ×3 about axis
    cirpattern3_axis = Axis((0, 0, 0), (0, 0, 1))
    add([cut_extrude3.rotate(cirpattern3_axis, i * CIRPATTERN3_ANGLE / (CIRPATTERN3_COUNT - 1)) for i in range(1, CIRPATTERN3_COUNT)], mode=Mode.SUBTRACT)
    add([cut_extrude5.rotate(cirpattern3_axis, i * CIRPATTERN3_ANGLE / (CIRPATTERN3_COUNT - 1)) for i in range(1, CIRPATTERN3_COUNT)], mode=Mode.SUBTRACT)


solid = part.part
